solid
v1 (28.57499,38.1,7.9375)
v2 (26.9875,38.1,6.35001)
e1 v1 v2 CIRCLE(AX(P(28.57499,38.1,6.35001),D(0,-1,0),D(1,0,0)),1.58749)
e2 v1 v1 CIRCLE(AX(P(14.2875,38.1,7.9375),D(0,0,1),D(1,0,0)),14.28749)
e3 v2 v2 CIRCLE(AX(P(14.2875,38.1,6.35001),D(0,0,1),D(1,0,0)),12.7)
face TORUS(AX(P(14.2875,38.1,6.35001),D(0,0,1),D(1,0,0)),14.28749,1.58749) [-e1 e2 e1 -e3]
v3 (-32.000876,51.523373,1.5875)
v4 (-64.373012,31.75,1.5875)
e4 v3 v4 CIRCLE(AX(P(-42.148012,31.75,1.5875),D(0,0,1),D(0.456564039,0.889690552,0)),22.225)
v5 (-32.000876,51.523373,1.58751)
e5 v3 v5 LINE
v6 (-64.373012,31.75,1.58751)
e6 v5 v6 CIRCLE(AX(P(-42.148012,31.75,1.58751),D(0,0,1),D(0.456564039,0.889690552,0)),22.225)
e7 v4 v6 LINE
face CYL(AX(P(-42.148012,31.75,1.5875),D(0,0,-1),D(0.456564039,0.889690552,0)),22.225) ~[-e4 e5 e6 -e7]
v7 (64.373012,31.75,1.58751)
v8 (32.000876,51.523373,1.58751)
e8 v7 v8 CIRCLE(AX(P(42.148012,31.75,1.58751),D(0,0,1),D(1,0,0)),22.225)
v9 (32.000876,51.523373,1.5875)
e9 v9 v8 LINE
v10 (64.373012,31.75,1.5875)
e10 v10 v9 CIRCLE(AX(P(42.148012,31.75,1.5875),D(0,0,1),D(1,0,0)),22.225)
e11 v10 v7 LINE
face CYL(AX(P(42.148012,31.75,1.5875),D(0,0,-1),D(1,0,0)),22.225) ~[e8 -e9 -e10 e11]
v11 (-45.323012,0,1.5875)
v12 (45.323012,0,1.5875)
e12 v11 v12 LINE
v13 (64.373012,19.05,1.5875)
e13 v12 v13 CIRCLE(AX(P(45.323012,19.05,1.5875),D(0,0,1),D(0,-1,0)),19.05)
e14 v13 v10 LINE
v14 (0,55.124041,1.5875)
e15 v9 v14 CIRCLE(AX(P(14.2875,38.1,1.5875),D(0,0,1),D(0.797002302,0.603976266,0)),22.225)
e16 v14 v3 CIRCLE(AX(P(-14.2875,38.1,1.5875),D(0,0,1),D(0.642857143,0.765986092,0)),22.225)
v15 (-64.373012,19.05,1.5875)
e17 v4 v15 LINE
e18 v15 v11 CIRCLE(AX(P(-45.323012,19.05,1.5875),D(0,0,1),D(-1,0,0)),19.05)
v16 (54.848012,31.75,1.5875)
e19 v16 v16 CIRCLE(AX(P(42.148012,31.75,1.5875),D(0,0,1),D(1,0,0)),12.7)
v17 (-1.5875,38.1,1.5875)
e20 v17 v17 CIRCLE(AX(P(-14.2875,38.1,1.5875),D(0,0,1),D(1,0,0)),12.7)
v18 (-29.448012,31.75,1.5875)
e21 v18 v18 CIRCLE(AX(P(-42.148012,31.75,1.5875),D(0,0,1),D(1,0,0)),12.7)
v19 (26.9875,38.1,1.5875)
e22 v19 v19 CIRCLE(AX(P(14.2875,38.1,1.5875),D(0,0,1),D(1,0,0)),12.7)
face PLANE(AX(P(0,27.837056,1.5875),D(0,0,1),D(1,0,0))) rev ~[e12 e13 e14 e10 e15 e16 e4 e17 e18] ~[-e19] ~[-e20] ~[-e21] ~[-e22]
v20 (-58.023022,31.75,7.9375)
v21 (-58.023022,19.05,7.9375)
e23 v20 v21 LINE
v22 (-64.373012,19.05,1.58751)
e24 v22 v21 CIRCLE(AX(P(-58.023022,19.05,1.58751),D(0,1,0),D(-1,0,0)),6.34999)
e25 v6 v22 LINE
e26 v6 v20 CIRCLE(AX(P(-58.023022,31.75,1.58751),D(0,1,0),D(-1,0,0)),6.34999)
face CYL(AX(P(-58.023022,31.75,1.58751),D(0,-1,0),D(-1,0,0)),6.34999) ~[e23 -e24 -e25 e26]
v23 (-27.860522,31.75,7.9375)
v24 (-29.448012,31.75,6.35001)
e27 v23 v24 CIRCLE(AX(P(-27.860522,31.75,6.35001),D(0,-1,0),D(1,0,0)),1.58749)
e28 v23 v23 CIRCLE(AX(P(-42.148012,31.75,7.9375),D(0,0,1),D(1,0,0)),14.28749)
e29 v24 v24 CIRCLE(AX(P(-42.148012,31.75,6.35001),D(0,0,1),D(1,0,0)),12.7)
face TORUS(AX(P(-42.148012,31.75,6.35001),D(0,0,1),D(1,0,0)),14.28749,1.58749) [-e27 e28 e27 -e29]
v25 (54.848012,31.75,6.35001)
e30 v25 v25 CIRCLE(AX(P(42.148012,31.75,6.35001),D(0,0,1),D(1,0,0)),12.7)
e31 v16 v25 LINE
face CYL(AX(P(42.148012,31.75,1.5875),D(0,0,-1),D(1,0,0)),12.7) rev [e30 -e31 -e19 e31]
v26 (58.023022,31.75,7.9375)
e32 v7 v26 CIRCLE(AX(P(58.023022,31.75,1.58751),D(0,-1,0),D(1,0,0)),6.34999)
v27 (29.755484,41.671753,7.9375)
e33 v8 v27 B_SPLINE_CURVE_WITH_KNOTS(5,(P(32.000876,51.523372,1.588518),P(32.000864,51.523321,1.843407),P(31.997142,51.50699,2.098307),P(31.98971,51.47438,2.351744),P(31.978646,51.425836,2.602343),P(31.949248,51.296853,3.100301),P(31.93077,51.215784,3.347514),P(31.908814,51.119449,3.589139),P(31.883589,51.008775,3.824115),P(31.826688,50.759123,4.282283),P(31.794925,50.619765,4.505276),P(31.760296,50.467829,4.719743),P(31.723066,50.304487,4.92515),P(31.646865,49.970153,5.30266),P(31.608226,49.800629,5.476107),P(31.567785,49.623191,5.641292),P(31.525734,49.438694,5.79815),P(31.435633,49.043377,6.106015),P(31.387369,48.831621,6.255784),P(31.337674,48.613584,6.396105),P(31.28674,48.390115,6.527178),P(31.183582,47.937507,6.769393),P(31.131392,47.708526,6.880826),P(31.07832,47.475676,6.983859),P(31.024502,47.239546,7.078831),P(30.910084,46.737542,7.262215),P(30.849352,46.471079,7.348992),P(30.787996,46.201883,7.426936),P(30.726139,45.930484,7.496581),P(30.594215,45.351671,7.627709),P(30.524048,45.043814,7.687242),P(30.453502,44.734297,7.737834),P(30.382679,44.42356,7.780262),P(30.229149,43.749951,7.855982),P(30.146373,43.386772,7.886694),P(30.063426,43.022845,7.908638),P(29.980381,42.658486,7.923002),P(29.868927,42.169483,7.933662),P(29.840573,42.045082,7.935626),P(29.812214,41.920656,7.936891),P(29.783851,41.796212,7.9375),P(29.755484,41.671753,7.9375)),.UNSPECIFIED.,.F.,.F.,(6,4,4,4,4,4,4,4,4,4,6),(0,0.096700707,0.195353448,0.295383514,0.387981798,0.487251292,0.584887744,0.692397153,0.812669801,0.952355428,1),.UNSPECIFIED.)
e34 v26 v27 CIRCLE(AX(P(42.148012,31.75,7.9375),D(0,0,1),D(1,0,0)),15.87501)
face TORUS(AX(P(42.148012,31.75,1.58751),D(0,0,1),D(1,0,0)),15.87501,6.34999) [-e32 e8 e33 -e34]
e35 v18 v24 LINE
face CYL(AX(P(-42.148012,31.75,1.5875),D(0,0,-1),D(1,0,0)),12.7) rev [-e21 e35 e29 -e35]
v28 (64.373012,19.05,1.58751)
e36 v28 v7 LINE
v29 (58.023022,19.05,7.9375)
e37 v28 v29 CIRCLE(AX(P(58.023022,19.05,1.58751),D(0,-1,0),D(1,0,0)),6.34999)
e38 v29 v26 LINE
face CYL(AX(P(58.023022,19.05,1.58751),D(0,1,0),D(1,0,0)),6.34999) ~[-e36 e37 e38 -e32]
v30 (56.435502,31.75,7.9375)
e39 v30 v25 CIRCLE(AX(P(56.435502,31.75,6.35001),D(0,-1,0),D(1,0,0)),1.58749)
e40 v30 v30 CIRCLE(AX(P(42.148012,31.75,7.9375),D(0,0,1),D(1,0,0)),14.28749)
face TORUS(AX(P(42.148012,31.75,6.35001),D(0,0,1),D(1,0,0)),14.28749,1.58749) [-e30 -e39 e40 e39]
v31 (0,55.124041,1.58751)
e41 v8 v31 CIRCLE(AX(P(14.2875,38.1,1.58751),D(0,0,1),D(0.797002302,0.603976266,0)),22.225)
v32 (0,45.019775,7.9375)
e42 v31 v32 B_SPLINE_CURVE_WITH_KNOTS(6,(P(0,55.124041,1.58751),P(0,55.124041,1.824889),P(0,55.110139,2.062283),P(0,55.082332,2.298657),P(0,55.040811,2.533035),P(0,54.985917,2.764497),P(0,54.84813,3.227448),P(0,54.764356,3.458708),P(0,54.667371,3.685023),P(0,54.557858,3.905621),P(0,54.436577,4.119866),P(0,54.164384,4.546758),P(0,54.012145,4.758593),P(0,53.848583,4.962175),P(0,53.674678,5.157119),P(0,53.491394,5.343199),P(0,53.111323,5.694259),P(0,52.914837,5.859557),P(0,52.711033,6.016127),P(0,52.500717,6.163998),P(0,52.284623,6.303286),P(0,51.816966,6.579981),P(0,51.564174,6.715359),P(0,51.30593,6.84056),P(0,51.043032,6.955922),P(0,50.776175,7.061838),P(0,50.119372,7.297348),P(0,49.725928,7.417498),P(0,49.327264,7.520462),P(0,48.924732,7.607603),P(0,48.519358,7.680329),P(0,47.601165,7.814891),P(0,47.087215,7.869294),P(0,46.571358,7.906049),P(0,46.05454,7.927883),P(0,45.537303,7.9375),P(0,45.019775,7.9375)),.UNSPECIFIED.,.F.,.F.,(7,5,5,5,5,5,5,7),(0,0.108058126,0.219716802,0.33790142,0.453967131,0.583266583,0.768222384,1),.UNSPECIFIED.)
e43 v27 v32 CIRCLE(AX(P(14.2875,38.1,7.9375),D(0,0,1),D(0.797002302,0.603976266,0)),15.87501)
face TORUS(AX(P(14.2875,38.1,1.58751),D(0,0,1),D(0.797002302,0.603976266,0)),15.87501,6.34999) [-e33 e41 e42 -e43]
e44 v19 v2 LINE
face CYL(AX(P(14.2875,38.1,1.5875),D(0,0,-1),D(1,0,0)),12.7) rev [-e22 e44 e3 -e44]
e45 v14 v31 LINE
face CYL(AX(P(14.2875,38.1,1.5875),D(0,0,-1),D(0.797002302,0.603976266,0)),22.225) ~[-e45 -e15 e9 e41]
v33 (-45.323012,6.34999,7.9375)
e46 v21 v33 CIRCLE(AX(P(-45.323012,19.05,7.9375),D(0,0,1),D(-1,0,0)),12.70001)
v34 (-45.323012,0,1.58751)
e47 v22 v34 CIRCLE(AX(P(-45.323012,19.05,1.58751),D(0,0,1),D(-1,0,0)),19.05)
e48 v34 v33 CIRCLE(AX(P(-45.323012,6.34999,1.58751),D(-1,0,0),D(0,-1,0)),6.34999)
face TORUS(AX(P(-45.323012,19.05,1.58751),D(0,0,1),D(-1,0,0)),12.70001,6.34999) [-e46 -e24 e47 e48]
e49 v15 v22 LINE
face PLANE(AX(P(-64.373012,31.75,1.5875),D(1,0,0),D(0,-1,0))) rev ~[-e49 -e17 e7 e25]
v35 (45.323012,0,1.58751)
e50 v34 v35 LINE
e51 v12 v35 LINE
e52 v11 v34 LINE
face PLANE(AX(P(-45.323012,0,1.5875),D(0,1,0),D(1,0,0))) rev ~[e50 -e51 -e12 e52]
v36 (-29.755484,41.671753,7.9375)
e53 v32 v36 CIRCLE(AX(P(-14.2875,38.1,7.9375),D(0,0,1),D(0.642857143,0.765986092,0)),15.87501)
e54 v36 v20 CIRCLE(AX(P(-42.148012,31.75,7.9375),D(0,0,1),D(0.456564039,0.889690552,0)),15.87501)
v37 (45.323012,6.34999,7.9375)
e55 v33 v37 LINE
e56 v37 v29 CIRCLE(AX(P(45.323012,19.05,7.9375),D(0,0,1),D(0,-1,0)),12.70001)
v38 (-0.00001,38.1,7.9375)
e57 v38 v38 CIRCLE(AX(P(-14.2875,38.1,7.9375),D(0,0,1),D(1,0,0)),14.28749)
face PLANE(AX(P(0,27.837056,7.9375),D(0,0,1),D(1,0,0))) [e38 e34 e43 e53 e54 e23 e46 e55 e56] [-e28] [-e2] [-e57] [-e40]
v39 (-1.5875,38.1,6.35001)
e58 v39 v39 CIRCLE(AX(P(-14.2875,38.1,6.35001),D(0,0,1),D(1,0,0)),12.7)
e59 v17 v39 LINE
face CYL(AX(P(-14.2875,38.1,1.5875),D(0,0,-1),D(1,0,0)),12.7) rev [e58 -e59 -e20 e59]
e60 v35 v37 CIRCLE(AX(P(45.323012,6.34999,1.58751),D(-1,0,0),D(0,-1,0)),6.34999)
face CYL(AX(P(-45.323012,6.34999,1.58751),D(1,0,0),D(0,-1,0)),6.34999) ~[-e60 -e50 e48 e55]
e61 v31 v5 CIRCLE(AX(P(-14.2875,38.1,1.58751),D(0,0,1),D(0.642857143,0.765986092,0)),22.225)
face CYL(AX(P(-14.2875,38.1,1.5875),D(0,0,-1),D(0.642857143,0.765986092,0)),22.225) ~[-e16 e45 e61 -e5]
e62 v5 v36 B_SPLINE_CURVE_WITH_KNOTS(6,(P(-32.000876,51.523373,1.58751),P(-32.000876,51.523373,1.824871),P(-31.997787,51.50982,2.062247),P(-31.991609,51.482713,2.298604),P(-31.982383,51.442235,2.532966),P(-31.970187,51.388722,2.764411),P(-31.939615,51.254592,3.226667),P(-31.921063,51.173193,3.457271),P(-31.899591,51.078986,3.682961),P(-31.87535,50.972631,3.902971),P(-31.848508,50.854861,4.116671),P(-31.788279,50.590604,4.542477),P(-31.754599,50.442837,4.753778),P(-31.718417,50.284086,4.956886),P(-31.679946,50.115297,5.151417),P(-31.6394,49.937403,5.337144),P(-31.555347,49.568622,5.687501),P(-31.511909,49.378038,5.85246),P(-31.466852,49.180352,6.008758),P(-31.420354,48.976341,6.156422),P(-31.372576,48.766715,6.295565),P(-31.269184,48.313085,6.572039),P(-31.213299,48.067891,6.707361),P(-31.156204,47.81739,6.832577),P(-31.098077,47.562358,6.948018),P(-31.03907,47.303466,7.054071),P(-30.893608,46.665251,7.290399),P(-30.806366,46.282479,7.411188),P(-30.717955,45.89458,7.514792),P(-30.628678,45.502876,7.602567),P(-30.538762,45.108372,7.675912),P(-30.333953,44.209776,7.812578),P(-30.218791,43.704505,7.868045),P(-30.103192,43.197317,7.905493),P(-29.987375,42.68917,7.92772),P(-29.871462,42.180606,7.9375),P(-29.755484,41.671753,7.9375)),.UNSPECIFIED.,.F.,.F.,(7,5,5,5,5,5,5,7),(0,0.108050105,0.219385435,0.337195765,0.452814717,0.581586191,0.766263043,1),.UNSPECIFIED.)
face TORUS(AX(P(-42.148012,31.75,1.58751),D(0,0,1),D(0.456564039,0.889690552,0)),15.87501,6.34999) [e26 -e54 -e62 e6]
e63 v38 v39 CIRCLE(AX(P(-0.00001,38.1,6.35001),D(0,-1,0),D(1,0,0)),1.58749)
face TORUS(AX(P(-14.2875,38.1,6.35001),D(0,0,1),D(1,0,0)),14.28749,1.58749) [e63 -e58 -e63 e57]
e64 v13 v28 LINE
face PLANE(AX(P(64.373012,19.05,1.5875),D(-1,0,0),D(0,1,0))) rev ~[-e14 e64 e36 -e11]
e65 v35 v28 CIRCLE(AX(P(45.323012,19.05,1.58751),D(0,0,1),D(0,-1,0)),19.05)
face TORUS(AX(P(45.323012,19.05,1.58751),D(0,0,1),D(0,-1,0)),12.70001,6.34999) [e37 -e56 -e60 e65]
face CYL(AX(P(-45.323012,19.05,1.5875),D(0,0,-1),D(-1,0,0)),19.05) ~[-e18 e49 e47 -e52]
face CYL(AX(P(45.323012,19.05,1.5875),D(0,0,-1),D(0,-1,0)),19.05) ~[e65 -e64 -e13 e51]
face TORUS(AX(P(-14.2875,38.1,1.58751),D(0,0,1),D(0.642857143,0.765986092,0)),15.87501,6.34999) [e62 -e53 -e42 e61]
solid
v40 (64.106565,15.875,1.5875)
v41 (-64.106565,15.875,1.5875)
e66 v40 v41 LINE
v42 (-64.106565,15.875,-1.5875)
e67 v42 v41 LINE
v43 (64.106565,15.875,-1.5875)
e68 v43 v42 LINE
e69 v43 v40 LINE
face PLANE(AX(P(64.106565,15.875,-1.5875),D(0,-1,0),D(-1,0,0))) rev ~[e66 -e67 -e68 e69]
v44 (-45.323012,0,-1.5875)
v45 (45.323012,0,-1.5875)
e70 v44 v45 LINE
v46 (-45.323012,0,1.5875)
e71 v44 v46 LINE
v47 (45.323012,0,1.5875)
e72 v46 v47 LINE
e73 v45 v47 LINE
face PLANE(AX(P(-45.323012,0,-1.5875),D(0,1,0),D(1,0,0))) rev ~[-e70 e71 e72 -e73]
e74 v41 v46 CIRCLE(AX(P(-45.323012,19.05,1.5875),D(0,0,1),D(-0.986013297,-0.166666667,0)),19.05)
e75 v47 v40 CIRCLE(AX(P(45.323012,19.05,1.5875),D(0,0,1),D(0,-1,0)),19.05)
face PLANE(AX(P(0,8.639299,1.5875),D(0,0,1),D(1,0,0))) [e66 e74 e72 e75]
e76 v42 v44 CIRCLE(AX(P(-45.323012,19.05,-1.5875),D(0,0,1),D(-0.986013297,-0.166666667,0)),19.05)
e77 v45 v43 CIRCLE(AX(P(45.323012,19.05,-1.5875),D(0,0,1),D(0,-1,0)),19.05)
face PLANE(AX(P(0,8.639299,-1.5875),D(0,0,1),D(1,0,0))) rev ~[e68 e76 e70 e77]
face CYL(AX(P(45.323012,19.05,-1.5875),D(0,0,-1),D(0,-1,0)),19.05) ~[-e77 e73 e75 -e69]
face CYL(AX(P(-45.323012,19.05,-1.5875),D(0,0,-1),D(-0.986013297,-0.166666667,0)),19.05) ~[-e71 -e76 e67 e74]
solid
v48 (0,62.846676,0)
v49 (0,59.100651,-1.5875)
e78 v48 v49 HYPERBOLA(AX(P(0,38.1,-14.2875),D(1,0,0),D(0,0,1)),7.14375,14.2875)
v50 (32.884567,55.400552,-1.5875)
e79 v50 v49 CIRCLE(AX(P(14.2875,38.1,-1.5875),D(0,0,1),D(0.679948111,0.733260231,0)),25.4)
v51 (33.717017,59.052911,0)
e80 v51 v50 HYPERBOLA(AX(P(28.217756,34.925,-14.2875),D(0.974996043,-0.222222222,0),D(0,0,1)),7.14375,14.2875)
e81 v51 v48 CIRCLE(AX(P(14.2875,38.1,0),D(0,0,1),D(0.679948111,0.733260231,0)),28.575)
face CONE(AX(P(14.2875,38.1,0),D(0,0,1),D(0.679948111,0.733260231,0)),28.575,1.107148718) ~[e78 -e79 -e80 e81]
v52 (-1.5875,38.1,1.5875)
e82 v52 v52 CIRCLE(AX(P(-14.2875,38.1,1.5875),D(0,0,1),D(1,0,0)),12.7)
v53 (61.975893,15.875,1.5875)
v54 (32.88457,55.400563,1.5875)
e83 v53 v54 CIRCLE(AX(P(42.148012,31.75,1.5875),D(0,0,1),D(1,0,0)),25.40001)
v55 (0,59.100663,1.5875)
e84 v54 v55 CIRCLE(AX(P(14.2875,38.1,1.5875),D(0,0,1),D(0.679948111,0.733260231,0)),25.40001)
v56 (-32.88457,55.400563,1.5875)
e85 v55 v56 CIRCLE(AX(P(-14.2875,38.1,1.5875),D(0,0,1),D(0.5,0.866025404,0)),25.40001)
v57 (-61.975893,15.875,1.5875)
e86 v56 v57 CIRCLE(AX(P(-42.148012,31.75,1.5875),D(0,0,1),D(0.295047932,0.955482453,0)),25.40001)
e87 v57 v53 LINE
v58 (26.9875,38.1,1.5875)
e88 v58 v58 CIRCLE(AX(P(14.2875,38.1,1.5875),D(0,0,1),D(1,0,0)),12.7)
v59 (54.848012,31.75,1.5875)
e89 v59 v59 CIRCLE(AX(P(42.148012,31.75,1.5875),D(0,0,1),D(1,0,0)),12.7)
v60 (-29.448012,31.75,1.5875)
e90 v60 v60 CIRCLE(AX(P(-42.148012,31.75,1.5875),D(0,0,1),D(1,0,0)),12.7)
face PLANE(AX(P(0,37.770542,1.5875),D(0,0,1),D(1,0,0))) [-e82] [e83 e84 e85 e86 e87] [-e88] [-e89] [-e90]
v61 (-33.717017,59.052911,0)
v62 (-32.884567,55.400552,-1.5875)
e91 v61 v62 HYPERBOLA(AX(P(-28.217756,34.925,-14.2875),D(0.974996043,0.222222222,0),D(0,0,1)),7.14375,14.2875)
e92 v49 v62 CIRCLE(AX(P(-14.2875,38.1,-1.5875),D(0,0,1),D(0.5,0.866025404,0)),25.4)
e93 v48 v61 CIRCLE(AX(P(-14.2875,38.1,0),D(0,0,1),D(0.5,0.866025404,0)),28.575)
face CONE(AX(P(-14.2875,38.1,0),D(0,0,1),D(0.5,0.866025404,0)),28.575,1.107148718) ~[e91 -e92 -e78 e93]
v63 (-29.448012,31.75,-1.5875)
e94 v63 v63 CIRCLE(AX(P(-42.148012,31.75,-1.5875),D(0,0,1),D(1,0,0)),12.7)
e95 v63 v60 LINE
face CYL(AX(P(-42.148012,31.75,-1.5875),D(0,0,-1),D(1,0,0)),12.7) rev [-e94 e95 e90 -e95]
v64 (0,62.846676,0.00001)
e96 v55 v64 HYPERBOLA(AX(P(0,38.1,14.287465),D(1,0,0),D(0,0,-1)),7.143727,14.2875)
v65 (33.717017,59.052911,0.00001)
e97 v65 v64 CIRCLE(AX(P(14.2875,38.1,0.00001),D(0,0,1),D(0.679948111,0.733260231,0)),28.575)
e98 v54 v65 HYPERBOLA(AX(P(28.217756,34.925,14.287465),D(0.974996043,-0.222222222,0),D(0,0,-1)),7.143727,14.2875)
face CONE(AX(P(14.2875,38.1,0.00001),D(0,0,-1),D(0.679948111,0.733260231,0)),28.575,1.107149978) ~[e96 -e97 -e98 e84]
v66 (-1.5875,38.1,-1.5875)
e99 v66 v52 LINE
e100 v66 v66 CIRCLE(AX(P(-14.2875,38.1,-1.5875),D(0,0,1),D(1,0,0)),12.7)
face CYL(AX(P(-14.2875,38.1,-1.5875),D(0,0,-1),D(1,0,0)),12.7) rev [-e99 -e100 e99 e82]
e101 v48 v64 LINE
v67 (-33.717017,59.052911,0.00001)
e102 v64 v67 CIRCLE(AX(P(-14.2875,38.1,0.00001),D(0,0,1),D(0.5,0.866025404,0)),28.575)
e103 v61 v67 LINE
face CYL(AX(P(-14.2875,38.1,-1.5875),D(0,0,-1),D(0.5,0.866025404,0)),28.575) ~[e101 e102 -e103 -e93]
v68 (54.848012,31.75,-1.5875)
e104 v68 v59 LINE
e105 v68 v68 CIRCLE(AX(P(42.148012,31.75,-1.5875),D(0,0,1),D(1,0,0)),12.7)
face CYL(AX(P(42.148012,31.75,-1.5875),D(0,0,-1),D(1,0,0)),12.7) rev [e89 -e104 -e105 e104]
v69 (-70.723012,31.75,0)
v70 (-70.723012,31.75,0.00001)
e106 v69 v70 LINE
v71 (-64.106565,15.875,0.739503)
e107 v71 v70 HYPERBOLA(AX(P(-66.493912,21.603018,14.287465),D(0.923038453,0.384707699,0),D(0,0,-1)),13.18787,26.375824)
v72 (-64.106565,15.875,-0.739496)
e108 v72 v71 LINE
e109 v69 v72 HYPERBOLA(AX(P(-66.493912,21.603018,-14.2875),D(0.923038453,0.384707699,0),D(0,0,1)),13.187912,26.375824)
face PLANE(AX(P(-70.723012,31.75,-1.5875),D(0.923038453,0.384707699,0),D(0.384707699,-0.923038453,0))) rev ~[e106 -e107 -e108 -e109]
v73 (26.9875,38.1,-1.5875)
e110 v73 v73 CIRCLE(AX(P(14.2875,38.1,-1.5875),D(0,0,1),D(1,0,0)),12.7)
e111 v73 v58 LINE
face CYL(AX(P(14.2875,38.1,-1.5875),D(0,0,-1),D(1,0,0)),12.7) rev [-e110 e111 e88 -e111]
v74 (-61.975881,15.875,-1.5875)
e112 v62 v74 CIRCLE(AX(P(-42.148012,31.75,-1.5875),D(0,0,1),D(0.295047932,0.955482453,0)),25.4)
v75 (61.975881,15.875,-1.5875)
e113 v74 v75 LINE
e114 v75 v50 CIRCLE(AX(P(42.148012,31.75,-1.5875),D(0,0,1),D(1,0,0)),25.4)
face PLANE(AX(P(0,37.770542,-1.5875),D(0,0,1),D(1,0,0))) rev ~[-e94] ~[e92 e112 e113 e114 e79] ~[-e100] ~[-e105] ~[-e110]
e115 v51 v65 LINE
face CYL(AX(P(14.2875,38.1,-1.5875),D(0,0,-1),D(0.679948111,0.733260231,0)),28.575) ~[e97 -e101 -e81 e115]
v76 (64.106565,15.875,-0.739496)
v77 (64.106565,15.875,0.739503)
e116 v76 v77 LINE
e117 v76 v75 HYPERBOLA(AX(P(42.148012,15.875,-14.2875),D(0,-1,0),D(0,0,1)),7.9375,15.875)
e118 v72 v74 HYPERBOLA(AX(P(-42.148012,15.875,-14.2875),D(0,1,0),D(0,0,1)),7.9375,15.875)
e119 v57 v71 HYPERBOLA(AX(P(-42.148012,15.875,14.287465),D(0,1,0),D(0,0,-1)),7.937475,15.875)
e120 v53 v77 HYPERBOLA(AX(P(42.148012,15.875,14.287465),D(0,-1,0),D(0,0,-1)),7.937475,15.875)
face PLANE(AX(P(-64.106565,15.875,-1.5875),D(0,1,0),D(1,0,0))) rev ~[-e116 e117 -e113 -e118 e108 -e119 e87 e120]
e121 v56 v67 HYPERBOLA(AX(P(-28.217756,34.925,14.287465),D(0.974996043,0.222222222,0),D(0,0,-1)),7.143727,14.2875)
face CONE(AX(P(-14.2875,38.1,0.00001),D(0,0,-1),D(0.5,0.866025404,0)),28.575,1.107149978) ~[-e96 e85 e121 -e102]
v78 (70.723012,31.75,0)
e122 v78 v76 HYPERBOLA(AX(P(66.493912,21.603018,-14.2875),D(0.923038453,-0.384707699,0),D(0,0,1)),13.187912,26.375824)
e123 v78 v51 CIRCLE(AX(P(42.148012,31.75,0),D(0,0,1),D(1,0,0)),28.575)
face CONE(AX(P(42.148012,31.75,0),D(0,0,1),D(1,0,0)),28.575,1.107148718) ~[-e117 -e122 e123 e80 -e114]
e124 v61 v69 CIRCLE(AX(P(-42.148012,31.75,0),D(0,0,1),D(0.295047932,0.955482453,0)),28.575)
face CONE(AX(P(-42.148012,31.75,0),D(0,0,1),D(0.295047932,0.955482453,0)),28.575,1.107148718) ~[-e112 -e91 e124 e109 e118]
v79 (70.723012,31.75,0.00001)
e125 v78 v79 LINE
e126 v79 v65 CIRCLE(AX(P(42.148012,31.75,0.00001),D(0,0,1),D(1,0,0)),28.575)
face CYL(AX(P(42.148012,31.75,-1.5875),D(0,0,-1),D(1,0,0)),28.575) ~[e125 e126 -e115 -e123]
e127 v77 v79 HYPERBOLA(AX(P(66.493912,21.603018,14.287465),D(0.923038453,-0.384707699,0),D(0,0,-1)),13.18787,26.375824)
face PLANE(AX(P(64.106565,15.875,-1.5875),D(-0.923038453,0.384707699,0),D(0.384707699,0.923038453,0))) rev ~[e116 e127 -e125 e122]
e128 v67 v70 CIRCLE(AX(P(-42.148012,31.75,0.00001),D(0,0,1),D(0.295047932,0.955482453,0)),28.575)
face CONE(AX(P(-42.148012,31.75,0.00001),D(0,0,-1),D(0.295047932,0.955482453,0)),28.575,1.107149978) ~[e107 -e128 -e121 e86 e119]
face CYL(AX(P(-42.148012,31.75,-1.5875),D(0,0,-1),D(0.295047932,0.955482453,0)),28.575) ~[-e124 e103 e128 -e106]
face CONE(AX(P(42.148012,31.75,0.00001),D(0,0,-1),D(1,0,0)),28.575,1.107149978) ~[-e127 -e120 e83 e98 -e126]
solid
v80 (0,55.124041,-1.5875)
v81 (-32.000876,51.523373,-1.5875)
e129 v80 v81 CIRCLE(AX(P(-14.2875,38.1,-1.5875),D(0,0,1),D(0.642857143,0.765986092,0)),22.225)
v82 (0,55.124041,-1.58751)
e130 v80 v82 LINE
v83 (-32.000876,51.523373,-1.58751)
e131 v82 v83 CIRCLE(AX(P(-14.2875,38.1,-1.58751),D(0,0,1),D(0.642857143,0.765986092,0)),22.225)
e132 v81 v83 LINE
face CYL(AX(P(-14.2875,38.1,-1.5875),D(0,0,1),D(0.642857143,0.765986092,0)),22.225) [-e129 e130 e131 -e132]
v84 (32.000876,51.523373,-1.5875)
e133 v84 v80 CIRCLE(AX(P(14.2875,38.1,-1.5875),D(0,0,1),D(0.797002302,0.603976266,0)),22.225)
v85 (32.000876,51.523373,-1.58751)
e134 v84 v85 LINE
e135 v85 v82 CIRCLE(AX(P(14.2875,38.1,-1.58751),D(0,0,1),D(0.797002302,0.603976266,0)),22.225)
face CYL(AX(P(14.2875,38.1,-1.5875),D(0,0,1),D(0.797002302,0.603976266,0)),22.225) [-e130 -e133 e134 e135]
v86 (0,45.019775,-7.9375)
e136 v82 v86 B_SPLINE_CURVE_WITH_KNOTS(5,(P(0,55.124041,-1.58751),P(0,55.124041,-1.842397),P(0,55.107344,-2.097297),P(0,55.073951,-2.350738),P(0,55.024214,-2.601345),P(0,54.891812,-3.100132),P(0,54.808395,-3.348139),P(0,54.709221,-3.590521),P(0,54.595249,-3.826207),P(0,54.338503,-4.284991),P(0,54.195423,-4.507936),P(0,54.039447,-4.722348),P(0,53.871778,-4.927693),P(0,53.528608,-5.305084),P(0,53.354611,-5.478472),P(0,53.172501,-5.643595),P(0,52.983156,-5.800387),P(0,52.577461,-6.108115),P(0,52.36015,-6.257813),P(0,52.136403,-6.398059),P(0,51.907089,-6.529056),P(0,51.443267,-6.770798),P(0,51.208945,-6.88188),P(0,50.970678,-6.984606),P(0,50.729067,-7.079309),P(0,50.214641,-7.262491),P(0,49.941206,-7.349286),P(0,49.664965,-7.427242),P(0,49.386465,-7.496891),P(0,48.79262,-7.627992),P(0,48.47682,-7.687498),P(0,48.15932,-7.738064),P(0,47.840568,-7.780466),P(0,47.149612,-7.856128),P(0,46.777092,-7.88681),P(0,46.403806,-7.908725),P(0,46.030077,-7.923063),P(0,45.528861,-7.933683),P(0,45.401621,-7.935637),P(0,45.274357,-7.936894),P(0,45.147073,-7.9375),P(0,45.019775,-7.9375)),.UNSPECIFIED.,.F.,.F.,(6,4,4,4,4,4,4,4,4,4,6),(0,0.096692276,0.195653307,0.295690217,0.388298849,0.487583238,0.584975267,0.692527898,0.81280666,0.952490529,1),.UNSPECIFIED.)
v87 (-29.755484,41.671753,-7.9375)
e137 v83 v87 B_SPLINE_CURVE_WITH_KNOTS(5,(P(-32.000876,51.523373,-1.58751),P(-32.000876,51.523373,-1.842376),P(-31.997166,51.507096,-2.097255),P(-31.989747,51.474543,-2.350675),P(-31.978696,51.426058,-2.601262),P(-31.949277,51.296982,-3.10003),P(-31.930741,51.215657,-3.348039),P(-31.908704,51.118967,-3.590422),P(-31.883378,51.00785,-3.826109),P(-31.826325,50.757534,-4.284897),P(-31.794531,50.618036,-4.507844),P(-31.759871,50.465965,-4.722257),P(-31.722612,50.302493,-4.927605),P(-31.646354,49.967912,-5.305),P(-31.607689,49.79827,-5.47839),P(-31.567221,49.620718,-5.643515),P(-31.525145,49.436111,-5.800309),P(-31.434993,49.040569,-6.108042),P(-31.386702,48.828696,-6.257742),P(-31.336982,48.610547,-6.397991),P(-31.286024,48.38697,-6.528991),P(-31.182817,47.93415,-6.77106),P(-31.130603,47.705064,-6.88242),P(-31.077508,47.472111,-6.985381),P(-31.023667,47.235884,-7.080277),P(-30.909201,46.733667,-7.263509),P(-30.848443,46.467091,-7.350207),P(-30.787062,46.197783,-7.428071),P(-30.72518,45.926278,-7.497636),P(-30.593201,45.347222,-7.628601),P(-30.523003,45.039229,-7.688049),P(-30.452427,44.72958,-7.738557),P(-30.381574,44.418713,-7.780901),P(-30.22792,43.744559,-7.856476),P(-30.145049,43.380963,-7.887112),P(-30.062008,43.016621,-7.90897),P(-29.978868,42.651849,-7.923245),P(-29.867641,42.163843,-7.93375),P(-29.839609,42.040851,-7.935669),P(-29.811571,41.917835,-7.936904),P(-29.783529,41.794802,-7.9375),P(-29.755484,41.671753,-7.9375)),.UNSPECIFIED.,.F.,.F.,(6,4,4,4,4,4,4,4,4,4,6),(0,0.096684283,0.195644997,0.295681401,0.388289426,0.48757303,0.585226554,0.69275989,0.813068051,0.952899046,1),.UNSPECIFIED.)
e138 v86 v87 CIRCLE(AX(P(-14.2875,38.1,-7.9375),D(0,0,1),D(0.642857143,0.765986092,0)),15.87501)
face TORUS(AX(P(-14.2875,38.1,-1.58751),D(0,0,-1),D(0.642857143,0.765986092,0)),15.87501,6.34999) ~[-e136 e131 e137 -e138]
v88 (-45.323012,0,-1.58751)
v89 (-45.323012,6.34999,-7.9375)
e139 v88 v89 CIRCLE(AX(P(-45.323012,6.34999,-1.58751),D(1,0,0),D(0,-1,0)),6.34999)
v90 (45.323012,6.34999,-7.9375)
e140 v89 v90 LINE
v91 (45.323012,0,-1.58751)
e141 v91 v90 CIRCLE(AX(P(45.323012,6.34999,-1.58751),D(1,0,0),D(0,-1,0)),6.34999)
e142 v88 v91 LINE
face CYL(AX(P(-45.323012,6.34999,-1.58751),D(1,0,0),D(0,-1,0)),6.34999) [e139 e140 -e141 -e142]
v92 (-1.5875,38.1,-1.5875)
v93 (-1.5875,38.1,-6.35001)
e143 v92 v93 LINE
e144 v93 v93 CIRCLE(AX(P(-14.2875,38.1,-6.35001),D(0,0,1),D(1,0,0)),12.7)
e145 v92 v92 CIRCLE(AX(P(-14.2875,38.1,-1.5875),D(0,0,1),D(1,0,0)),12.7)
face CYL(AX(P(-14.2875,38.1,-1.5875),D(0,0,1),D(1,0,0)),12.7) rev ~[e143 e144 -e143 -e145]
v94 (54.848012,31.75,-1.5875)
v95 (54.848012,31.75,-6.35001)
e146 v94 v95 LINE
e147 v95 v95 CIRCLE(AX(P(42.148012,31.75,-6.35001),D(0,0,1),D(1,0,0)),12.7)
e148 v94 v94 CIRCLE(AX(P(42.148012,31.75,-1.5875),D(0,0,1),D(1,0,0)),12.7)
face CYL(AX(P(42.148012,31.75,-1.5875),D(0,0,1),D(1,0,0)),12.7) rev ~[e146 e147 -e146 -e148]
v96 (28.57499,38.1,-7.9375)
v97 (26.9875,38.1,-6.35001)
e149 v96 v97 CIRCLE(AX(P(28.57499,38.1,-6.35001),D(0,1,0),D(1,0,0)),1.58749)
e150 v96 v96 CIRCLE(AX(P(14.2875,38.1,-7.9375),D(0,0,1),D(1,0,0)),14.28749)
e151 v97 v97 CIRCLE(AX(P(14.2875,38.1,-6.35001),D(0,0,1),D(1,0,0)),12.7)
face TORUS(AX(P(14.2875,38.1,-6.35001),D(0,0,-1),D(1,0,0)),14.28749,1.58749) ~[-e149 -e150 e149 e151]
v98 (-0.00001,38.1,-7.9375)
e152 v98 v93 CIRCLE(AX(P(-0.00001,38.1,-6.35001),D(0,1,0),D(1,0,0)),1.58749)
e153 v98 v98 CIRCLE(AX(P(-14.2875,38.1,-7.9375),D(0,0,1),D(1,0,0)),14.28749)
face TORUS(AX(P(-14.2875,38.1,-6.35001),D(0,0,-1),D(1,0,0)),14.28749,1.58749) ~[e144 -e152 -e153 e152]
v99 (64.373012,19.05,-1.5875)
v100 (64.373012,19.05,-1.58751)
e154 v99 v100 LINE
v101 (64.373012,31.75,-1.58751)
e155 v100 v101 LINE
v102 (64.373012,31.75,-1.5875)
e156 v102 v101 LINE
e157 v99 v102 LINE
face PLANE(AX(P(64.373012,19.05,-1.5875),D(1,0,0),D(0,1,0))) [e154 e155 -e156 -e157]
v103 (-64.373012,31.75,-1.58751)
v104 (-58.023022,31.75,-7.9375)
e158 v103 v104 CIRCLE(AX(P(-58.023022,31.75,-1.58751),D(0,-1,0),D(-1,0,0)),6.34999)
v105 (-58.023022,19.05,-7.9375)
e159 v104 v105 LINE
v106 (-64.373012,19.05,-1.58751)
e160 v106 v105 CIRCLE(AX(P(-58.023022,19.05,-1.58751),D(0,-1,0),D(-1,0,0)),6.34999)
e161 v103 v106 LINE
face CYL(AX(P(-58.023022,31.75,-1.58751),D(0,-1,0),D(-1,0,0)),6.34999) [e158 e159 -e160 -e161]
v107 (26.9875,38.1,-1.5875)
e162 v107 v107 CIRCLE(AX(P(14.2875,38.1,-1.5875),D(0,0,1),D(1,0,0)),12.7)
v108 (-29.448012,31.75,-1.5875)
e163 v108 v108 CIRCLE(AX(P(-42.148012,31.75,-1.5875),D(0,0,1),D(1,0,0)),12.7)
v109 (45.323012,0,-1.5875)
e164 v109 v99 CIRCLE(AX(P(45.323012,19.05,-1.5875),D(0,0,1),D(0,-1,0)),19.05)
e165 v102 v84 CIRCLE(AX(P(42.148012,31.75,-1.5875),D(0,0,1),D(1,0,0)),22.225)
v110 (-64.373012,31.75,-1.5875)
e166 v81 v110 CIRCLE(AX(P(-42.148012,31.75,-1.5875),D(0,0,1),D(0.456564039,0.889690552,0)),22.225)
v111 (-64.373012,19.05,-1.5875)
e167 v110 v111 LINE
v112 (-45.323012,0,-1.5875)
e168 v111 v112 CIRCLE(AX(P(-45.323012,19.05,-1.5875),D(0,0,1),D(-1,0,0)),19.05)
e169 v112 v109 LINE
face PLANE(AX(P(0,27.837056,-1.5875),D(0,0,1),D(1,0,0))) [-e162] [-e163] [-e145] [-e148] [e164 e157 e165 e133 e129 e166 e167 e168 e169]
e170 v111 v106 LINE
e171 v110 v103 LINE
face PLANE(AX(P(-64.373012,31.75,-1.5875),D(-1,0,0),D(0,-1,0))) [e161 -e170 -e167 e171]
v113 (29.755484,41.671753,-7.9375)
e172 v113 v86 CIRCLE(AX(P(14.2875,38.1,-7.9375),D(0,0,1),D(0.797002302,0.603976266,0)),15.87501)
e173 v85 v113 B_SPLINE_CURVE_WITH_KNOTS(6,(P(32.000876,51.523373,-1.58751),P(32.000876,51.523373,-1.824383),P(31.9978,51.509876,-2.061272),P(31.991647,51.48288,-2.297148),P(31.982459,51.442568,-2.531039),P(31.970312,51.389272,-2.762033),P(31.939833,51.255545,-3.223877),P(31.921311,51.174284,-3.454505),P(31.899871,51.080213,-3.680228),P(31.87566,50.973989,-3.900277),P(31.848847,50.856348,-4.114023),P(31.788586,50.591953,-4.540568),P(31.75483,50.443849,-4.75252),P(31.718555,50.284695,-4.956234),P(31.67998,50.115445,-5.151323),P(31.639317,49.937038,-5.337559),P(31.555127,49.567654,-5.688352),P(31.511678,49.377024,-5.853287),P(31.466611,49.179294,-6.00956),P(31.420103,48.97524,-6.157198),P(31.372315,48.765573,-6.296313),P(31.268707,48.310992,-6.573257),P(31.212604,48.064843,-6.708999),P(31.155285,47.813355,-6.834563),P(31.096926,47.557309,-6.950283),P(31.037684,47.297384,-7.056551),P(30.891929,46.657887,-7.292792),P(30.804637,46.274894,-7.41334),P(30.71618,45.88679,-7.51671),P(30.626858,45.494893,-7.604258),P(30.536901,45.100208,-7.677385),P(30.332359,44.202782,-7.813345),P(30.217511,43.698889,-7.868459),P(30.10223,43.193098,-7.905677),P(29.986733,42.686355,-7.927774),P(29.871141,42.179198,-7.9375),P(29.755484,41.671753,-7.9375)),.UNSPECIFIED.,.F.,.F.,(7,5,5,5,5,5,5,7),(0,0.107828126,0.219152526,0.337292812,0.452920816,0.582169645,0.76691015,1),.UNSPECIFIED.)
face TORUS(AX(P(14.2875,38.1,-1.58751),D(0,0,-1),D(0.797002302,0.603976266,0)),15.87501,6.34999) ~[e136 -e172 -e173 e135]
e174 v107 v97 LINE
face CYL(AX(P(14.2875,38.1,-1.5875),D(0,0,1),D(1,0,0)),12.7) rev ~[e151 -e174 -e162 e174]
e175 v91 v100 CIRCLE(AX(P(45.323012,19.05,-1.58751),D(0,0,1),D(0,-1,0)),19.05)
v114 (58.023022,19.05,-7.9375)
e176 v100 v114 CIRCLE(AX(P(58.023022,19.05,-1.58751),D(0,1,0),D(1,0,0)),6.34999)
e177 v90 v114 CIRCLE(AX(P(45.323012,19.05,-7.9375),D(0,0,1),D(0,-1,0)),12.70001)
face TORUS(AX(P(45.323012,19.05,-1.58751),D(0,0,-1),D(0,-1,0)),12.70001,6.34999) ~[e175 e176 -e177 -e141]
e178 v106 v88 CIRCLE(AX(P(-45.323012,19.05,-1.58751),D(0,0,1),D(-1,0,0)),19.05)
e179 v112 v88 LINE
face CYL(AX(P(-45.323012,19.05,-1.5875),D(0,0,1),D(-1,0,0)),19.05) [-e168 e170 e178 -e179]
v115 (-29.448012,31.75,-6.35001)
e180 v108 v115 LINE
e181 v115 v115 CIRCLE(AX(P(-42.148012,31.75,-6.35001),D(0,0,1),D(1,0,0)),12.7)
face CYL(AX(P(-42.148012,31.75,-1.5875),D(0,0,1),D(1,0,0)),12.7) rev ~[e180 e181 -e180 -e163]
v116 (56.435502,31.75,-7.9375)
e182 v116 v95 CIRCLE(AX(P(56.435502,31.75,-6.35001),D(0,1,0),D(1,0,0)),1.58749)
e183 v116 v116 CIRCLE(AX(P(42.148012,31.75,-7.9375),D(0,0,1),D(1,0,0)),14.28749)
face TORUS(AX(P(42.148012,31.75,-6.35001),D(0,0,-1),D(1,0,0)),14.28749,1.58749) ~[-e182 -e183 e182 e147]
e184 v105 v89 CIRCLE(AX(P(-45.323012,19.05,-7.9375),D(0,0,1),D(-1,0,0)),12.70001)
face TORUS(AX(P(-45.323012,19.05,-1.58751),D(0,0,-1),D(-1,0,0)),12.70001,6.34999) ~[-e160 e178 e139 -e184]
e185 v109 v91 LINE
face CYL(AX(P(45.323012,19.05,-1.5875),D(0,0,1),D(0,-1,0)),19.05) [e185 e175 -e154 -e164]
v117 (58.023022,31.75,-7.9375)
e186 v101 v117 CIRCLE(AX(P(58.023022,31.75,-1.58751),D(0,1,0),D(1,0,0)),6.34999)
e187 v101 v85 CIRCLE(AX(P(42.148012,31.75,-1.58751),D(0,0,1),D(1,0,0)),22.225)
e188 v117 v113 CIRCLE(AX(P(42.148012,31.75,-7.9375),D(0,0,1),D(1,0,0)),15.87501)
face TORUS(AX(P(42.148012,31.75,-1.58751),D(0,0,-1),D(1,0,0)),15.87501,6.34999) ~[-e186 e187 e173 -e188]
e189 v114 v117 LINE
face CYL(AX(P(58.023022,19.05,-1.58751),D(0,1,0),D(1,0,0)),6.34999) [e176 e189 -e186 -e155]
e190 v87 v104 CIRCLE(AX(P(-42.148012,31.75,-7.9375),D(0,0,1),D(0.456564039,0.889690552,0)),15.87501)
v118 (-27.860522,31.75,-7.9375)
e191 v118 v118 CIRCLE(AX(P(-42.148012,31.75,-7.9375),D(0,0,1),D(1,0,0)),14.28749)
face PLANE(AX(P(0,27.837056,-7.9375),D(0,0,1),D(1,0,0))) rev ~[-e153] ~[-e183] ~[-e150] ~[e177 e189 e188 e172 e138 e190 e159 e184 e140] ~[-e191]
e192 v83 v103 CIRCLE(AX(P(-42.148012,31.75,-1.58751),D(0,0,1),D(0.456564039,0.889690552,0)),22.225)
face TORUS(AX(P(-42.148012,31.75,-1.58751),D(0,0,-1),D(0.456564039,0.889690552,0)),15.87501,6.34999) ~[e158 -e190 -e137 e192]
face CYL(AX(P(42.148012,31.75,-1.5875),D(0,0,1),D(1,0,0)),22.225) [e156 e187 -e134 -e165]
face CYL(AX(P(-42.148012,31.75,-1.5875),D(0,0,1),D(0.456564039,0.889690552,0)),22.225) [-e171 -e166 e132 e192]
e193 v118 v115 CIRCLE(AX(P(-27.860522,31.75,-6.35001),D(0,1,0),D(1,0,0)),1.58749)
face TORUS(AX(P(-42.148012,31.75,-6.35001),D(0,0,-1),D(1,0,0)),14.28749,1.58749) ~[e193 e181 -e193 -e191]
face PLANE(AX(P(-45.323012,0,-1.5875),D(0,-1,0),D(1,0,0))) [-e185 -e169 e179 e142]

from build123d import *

# Parameters (mm, degrees)
F1_START = 1.5875
F0_R     = 12.7
F1_DEPTH = 6.35
F2_START = -1.5875
F2_DEPTH = 6.35
F3_R     = 12.7
F4_DEPTH = 3.175
F5_SIZE2 = 3.175
F5_SIZE  = 1.5875
F6_SIZE2 = 1.58749
F6_SIZE  = 3.17499
F7_DEPTH = 3.175
F8_R     = 6.34999
F8_2_R   = 6.34999
F9_R     = 1.58749
F9_2_R   = 1.58749


# Not quite as in the source:
# - a fillet or chamfer is up to 0.001 mm smaller than in the source, because OpenCascade refuses the exact size


with BuildPart() as f1:
    # F0 (on Top) → F1 (new body)
    with BuildSketch(Plane.XY.offset(F1_START)):
        with BuildLine():
            ThreePointArc((32.0008761662, 51.5233725194), (16.7725271795, 60.185634809), (0, 55.1240409054))
            ThreePointArc((0, 55.1240409054), (-16.7725271795, 60.185634809), (-32.0008761662, 51.5233725194))
            ThreePointArc((-32.0008761662, 51.5233725194), (-53.7331431906, 50.7166907676), (-64.37301193, 31.75))
            Line((-64.37301193, 31.75), (-64.37301193, 19.05))
            ThreePointArc((-64.37301193, 19.05), (-58.7933961116, 5.5796158184), (-45.32301193, 0))
            Line((-45.32301193, 0), (0, 0))
            Line((0, 0), (45.32301193, 0))
            ThreePointArc((45.32301193, 0), (58.7933961116, 5.5796158184), (64.37301193, 19.05))
            Line((64.37301193, 19.05), (64.37301193, 31.75))
            ThreePointArc((64.37301193, 31.75), (53.7331431906, 50.7166907676), (32.0008761662, 51.5233725194))
        make_face()
        with Locations((-42.14801193, 31.75)):
            Circle(F0_R, mode=Mode.SUBTRACT)
        with Locations((-14.2875, 38.1)):
            Circle(F0_R, mode=Mode.SUBTRACT)
        with Locations((14.2875, 38.1)):
            Circle(F0_R, mode=Mode.SUBTRACT)
        with Locations((42.14801193, 31.75)):
            Circle(F0_R, mode=Mode.SUBTRACT)
    extrude(amount=F1_DEPTH)

    # F8 (radius 6.35 in the source; OpenCascade refuses exactly that, so slightly less here)
    f8_edges = [f1.edges().sort_by_distance(p)[0] for p in [
        (-58.793396, 5.579616, 7.9375),
        (-64.373012, 25.4, 7.9375),
        (-53.733143, 50.716691, 7.9375),
        (-16.772527, 60.185635, 7.9375),
        (16.772527, 60.185635, 7.9375),
        (53.733143, 50.716691, 7.9375),
        (58.793396, 5.579616, 7.9375),
        (64.373012, 25.4, 7.9375),
        (0, 0, 7.9375),
    ]]
    fillet(f8_edges, radius=F8_R)

    # F9#2 (radius 1.5875 in the source; OpenCascade refuses exactly that, so slightly less here)
    f9_2_edges = [f1.edges().sort_by_distance(p)[0] for p in [
        (29.448012, 31.75, 7.9375),
        (1.5875, 38.1, 7.9375),
        (-26.9875, 38.1, 7.9375),
        (-54.848012, 31.75, 7.9375),
    ]]
    fillet(f9_2_edges, radius=F9_2_R)


with BuildPart() as f2:
    # F0 (on Top) → F2 (new body)
    with BuildSketch(Plane.XY.offset(F2_START)):
        with BuildLine():
            ThreePointArc((32.0008761662, 51.5233725194), (16.7725271795, 60.185634809), (0, 55.1240409054))
            ThreePointArc((0, 55.1240409054), (-16.7725271795, 60.185634809), (-32.0008761662, 51.5233725194))
            ThreePointArc((-32.0008761662, 51.5233725194), (-53.7331431906, 50.7166907676), (-64.37301193, 31.75))
            Line((-64.37301193, 31.75), (-64.37301193, 19.05))
            ThreePointArc((-64.37301193, 19.05), (-58.7933961116, 5.5796158184), (-45.32301193, 0))
            Line((-45.32301193, 0), (0, 0))
            Line((0, 0), (45.32301193, 0))
            ThreePointArc((45.32301193, 0), (58.7933961116, 5.5796158184), (64.37301193, 19.05))
            Line((64.37301193, 19.05), (64.37301193, 31.75))
            ThreePointArc((64.37301193, 31.75), (53.7331431906, 50.7166907676), (32.0008761662, 51.5233725194))
        make_face()
        with Locations((-42.14801193, 31.75)):
            Circle(F0_R, mode=Mode.SUBTRACT)
        with Locations((-14.2875, 38.1)):
            Circle(F0_R, mode=Mode.SUBTRACT)
        with Locations((14.2875, 38.1)):
            Circle(F0_R, mode=Mode.SUBTRACT)
        with Locations((42.14801193, 31.75)):
            Circle(F0_R, mode=Mode.SUBTRACT)
    extrude(amount=-F2_DEPTH)

    # F8#2 (radius 6.35 in the source; OpenCascade refuses exactly that, so slightly less here)
    f8_2_edges = [f2.edges().sort_by_distance(p)[0] for p in [
        (0, 0, -7.9375),
        (-64.373012, 25.4, -7.9375),
        (-16.772527, 60.185635, -7.9375),
        (-53.733143, 50.716691, -7.9375),
        (-58.793396, 5.579616, -7.9375),
        (16.772527, 60.185635, -7.9375),
        (53.733143, 50.716691, -7.9375),
        (64.373012, 25.4, -7.9375),
        (58.793396, 5.579616, -7.9375),
    ]]
    fillet(f8_2_edges, radius=F8_2_R)

    # F9 (radius 1.5875 in the source; OpenCascade refuses exactly that, so slightly less here)
    f9_edges = [f2.edges().sort_by_distance(p)[0] for p in [
        (-54.848012, 31.75, -7.9375),
        (-26.9875, 38.1, -7.9375),
        (1.5875, 38.1, -7.9375),
        (29.448012, 31.75, -7.9375),
    ]]
    fillet(f9_edges, radius=F9_R)


with BuildPart() as f4:
    # F3 (on face) → F4 (new body)
    with BuildSketch(Plane.XY.offset(-1.5875)):
        with BuildLine():
            Line((-70.72301193, 31.75), (-64.1065652413, 15.875))
            Line((-64.1065652413, 15.875), (64.1065652413, 15.875))
            Line((64.1065652413, 15.875), (70.72301193, 31.75))
            ThreePointArc((70.72301193, 31.75), (59.1129014499, 54.7439807031), (33.717017279, 59.0529110938))
            ThreePointArc((33.717017279, 59.0529110938), (17.4825349451, 66.495816183), (0, 62.8466759131))
            ThreePointArc((0, 62.8466759131), (-17.4825349451, 66.495816183), (-33.717017279, 59.0529110938))
            ThreePointArc((-33.717017279, 59.0529110938), (-59.1129014499, 54.7439807031), (-70.72301193, 31.75))
        make_face()
        with Locations((-42.14801193, 31.75)):
            Circle(F3_R, mode=Mode.SUBTRACT)
        with Locations((-14.2875, 38.1)):
            Circle(F3_R, mode=Mode.SUBTRACT)
        with Locations((14.2875, 38.1)):
            Circle(F3_R, mode=Mode.SUBTRACT)
        with Locations((42.14801193, 31.75)):
            Circle(F3_R, mode=Mode.SUBTRACT)
    extrude(amount=F4_DEPTH)

    # F5
    f5_edges = [f4.edges().sort_by_distance(p)[0] for p in [
        (-17.482535, 66.495816, -1.5875),
        (-59.112901, 54.743981, -1.5875),
        (17.482535, 66.495816, -1.5875),
        (59.112901, 54.743981, -1.5875),
    ]]
    chamfer(f5_edges, length=F5_SIZE, length2=F5_SIZE2)

    # F6 (size 3.175 and 1.5875 in the source; OpenCascade refuses exactly that, so slightly less here)
    f6_edges = [f4.edges().sort_by_distance(p)[0] for p in [
        (-59.112901, 54.743981, 1.5875),
        (-17.482535, 66.495816, 1.5875),
        (17.482535, 66.495816, 1.5875),
        (59.112901, 54.743981, 1.5875),
    ]]
    f6_side = f4.faces().sort_by_distance((0, 40.532073, 1.5875))[0]
    chamfer(f6_edges, length=F6_SIZE, length2=F6_SIZE2, reference=f6_side)


with BuildPart() as f7:
    # F3 (on face) → F7 (new body)
    with BuildSketch(Plane.XY.offset(-1.5875)):
        with BuildLine():
            Line((64.1065652413, 15.875), (-64.1065652413, 15.875))
            ThreePointArc((-64.1065652413, 15.875), (-57.6197340542, 4.5003221685), (-45.32301193, 0))
            Line((-45.32301193, 0), (45.32301193, 0))
            ThreePointArc((45.32301193, 0), (57.6197340542, 4.5003221685), (64.1065652413, 15.875))
        make_face()
    extrude(amount=F7_DEPTH)


solid = Compound([f1.part, f2.part, f4.part, f7.part])
